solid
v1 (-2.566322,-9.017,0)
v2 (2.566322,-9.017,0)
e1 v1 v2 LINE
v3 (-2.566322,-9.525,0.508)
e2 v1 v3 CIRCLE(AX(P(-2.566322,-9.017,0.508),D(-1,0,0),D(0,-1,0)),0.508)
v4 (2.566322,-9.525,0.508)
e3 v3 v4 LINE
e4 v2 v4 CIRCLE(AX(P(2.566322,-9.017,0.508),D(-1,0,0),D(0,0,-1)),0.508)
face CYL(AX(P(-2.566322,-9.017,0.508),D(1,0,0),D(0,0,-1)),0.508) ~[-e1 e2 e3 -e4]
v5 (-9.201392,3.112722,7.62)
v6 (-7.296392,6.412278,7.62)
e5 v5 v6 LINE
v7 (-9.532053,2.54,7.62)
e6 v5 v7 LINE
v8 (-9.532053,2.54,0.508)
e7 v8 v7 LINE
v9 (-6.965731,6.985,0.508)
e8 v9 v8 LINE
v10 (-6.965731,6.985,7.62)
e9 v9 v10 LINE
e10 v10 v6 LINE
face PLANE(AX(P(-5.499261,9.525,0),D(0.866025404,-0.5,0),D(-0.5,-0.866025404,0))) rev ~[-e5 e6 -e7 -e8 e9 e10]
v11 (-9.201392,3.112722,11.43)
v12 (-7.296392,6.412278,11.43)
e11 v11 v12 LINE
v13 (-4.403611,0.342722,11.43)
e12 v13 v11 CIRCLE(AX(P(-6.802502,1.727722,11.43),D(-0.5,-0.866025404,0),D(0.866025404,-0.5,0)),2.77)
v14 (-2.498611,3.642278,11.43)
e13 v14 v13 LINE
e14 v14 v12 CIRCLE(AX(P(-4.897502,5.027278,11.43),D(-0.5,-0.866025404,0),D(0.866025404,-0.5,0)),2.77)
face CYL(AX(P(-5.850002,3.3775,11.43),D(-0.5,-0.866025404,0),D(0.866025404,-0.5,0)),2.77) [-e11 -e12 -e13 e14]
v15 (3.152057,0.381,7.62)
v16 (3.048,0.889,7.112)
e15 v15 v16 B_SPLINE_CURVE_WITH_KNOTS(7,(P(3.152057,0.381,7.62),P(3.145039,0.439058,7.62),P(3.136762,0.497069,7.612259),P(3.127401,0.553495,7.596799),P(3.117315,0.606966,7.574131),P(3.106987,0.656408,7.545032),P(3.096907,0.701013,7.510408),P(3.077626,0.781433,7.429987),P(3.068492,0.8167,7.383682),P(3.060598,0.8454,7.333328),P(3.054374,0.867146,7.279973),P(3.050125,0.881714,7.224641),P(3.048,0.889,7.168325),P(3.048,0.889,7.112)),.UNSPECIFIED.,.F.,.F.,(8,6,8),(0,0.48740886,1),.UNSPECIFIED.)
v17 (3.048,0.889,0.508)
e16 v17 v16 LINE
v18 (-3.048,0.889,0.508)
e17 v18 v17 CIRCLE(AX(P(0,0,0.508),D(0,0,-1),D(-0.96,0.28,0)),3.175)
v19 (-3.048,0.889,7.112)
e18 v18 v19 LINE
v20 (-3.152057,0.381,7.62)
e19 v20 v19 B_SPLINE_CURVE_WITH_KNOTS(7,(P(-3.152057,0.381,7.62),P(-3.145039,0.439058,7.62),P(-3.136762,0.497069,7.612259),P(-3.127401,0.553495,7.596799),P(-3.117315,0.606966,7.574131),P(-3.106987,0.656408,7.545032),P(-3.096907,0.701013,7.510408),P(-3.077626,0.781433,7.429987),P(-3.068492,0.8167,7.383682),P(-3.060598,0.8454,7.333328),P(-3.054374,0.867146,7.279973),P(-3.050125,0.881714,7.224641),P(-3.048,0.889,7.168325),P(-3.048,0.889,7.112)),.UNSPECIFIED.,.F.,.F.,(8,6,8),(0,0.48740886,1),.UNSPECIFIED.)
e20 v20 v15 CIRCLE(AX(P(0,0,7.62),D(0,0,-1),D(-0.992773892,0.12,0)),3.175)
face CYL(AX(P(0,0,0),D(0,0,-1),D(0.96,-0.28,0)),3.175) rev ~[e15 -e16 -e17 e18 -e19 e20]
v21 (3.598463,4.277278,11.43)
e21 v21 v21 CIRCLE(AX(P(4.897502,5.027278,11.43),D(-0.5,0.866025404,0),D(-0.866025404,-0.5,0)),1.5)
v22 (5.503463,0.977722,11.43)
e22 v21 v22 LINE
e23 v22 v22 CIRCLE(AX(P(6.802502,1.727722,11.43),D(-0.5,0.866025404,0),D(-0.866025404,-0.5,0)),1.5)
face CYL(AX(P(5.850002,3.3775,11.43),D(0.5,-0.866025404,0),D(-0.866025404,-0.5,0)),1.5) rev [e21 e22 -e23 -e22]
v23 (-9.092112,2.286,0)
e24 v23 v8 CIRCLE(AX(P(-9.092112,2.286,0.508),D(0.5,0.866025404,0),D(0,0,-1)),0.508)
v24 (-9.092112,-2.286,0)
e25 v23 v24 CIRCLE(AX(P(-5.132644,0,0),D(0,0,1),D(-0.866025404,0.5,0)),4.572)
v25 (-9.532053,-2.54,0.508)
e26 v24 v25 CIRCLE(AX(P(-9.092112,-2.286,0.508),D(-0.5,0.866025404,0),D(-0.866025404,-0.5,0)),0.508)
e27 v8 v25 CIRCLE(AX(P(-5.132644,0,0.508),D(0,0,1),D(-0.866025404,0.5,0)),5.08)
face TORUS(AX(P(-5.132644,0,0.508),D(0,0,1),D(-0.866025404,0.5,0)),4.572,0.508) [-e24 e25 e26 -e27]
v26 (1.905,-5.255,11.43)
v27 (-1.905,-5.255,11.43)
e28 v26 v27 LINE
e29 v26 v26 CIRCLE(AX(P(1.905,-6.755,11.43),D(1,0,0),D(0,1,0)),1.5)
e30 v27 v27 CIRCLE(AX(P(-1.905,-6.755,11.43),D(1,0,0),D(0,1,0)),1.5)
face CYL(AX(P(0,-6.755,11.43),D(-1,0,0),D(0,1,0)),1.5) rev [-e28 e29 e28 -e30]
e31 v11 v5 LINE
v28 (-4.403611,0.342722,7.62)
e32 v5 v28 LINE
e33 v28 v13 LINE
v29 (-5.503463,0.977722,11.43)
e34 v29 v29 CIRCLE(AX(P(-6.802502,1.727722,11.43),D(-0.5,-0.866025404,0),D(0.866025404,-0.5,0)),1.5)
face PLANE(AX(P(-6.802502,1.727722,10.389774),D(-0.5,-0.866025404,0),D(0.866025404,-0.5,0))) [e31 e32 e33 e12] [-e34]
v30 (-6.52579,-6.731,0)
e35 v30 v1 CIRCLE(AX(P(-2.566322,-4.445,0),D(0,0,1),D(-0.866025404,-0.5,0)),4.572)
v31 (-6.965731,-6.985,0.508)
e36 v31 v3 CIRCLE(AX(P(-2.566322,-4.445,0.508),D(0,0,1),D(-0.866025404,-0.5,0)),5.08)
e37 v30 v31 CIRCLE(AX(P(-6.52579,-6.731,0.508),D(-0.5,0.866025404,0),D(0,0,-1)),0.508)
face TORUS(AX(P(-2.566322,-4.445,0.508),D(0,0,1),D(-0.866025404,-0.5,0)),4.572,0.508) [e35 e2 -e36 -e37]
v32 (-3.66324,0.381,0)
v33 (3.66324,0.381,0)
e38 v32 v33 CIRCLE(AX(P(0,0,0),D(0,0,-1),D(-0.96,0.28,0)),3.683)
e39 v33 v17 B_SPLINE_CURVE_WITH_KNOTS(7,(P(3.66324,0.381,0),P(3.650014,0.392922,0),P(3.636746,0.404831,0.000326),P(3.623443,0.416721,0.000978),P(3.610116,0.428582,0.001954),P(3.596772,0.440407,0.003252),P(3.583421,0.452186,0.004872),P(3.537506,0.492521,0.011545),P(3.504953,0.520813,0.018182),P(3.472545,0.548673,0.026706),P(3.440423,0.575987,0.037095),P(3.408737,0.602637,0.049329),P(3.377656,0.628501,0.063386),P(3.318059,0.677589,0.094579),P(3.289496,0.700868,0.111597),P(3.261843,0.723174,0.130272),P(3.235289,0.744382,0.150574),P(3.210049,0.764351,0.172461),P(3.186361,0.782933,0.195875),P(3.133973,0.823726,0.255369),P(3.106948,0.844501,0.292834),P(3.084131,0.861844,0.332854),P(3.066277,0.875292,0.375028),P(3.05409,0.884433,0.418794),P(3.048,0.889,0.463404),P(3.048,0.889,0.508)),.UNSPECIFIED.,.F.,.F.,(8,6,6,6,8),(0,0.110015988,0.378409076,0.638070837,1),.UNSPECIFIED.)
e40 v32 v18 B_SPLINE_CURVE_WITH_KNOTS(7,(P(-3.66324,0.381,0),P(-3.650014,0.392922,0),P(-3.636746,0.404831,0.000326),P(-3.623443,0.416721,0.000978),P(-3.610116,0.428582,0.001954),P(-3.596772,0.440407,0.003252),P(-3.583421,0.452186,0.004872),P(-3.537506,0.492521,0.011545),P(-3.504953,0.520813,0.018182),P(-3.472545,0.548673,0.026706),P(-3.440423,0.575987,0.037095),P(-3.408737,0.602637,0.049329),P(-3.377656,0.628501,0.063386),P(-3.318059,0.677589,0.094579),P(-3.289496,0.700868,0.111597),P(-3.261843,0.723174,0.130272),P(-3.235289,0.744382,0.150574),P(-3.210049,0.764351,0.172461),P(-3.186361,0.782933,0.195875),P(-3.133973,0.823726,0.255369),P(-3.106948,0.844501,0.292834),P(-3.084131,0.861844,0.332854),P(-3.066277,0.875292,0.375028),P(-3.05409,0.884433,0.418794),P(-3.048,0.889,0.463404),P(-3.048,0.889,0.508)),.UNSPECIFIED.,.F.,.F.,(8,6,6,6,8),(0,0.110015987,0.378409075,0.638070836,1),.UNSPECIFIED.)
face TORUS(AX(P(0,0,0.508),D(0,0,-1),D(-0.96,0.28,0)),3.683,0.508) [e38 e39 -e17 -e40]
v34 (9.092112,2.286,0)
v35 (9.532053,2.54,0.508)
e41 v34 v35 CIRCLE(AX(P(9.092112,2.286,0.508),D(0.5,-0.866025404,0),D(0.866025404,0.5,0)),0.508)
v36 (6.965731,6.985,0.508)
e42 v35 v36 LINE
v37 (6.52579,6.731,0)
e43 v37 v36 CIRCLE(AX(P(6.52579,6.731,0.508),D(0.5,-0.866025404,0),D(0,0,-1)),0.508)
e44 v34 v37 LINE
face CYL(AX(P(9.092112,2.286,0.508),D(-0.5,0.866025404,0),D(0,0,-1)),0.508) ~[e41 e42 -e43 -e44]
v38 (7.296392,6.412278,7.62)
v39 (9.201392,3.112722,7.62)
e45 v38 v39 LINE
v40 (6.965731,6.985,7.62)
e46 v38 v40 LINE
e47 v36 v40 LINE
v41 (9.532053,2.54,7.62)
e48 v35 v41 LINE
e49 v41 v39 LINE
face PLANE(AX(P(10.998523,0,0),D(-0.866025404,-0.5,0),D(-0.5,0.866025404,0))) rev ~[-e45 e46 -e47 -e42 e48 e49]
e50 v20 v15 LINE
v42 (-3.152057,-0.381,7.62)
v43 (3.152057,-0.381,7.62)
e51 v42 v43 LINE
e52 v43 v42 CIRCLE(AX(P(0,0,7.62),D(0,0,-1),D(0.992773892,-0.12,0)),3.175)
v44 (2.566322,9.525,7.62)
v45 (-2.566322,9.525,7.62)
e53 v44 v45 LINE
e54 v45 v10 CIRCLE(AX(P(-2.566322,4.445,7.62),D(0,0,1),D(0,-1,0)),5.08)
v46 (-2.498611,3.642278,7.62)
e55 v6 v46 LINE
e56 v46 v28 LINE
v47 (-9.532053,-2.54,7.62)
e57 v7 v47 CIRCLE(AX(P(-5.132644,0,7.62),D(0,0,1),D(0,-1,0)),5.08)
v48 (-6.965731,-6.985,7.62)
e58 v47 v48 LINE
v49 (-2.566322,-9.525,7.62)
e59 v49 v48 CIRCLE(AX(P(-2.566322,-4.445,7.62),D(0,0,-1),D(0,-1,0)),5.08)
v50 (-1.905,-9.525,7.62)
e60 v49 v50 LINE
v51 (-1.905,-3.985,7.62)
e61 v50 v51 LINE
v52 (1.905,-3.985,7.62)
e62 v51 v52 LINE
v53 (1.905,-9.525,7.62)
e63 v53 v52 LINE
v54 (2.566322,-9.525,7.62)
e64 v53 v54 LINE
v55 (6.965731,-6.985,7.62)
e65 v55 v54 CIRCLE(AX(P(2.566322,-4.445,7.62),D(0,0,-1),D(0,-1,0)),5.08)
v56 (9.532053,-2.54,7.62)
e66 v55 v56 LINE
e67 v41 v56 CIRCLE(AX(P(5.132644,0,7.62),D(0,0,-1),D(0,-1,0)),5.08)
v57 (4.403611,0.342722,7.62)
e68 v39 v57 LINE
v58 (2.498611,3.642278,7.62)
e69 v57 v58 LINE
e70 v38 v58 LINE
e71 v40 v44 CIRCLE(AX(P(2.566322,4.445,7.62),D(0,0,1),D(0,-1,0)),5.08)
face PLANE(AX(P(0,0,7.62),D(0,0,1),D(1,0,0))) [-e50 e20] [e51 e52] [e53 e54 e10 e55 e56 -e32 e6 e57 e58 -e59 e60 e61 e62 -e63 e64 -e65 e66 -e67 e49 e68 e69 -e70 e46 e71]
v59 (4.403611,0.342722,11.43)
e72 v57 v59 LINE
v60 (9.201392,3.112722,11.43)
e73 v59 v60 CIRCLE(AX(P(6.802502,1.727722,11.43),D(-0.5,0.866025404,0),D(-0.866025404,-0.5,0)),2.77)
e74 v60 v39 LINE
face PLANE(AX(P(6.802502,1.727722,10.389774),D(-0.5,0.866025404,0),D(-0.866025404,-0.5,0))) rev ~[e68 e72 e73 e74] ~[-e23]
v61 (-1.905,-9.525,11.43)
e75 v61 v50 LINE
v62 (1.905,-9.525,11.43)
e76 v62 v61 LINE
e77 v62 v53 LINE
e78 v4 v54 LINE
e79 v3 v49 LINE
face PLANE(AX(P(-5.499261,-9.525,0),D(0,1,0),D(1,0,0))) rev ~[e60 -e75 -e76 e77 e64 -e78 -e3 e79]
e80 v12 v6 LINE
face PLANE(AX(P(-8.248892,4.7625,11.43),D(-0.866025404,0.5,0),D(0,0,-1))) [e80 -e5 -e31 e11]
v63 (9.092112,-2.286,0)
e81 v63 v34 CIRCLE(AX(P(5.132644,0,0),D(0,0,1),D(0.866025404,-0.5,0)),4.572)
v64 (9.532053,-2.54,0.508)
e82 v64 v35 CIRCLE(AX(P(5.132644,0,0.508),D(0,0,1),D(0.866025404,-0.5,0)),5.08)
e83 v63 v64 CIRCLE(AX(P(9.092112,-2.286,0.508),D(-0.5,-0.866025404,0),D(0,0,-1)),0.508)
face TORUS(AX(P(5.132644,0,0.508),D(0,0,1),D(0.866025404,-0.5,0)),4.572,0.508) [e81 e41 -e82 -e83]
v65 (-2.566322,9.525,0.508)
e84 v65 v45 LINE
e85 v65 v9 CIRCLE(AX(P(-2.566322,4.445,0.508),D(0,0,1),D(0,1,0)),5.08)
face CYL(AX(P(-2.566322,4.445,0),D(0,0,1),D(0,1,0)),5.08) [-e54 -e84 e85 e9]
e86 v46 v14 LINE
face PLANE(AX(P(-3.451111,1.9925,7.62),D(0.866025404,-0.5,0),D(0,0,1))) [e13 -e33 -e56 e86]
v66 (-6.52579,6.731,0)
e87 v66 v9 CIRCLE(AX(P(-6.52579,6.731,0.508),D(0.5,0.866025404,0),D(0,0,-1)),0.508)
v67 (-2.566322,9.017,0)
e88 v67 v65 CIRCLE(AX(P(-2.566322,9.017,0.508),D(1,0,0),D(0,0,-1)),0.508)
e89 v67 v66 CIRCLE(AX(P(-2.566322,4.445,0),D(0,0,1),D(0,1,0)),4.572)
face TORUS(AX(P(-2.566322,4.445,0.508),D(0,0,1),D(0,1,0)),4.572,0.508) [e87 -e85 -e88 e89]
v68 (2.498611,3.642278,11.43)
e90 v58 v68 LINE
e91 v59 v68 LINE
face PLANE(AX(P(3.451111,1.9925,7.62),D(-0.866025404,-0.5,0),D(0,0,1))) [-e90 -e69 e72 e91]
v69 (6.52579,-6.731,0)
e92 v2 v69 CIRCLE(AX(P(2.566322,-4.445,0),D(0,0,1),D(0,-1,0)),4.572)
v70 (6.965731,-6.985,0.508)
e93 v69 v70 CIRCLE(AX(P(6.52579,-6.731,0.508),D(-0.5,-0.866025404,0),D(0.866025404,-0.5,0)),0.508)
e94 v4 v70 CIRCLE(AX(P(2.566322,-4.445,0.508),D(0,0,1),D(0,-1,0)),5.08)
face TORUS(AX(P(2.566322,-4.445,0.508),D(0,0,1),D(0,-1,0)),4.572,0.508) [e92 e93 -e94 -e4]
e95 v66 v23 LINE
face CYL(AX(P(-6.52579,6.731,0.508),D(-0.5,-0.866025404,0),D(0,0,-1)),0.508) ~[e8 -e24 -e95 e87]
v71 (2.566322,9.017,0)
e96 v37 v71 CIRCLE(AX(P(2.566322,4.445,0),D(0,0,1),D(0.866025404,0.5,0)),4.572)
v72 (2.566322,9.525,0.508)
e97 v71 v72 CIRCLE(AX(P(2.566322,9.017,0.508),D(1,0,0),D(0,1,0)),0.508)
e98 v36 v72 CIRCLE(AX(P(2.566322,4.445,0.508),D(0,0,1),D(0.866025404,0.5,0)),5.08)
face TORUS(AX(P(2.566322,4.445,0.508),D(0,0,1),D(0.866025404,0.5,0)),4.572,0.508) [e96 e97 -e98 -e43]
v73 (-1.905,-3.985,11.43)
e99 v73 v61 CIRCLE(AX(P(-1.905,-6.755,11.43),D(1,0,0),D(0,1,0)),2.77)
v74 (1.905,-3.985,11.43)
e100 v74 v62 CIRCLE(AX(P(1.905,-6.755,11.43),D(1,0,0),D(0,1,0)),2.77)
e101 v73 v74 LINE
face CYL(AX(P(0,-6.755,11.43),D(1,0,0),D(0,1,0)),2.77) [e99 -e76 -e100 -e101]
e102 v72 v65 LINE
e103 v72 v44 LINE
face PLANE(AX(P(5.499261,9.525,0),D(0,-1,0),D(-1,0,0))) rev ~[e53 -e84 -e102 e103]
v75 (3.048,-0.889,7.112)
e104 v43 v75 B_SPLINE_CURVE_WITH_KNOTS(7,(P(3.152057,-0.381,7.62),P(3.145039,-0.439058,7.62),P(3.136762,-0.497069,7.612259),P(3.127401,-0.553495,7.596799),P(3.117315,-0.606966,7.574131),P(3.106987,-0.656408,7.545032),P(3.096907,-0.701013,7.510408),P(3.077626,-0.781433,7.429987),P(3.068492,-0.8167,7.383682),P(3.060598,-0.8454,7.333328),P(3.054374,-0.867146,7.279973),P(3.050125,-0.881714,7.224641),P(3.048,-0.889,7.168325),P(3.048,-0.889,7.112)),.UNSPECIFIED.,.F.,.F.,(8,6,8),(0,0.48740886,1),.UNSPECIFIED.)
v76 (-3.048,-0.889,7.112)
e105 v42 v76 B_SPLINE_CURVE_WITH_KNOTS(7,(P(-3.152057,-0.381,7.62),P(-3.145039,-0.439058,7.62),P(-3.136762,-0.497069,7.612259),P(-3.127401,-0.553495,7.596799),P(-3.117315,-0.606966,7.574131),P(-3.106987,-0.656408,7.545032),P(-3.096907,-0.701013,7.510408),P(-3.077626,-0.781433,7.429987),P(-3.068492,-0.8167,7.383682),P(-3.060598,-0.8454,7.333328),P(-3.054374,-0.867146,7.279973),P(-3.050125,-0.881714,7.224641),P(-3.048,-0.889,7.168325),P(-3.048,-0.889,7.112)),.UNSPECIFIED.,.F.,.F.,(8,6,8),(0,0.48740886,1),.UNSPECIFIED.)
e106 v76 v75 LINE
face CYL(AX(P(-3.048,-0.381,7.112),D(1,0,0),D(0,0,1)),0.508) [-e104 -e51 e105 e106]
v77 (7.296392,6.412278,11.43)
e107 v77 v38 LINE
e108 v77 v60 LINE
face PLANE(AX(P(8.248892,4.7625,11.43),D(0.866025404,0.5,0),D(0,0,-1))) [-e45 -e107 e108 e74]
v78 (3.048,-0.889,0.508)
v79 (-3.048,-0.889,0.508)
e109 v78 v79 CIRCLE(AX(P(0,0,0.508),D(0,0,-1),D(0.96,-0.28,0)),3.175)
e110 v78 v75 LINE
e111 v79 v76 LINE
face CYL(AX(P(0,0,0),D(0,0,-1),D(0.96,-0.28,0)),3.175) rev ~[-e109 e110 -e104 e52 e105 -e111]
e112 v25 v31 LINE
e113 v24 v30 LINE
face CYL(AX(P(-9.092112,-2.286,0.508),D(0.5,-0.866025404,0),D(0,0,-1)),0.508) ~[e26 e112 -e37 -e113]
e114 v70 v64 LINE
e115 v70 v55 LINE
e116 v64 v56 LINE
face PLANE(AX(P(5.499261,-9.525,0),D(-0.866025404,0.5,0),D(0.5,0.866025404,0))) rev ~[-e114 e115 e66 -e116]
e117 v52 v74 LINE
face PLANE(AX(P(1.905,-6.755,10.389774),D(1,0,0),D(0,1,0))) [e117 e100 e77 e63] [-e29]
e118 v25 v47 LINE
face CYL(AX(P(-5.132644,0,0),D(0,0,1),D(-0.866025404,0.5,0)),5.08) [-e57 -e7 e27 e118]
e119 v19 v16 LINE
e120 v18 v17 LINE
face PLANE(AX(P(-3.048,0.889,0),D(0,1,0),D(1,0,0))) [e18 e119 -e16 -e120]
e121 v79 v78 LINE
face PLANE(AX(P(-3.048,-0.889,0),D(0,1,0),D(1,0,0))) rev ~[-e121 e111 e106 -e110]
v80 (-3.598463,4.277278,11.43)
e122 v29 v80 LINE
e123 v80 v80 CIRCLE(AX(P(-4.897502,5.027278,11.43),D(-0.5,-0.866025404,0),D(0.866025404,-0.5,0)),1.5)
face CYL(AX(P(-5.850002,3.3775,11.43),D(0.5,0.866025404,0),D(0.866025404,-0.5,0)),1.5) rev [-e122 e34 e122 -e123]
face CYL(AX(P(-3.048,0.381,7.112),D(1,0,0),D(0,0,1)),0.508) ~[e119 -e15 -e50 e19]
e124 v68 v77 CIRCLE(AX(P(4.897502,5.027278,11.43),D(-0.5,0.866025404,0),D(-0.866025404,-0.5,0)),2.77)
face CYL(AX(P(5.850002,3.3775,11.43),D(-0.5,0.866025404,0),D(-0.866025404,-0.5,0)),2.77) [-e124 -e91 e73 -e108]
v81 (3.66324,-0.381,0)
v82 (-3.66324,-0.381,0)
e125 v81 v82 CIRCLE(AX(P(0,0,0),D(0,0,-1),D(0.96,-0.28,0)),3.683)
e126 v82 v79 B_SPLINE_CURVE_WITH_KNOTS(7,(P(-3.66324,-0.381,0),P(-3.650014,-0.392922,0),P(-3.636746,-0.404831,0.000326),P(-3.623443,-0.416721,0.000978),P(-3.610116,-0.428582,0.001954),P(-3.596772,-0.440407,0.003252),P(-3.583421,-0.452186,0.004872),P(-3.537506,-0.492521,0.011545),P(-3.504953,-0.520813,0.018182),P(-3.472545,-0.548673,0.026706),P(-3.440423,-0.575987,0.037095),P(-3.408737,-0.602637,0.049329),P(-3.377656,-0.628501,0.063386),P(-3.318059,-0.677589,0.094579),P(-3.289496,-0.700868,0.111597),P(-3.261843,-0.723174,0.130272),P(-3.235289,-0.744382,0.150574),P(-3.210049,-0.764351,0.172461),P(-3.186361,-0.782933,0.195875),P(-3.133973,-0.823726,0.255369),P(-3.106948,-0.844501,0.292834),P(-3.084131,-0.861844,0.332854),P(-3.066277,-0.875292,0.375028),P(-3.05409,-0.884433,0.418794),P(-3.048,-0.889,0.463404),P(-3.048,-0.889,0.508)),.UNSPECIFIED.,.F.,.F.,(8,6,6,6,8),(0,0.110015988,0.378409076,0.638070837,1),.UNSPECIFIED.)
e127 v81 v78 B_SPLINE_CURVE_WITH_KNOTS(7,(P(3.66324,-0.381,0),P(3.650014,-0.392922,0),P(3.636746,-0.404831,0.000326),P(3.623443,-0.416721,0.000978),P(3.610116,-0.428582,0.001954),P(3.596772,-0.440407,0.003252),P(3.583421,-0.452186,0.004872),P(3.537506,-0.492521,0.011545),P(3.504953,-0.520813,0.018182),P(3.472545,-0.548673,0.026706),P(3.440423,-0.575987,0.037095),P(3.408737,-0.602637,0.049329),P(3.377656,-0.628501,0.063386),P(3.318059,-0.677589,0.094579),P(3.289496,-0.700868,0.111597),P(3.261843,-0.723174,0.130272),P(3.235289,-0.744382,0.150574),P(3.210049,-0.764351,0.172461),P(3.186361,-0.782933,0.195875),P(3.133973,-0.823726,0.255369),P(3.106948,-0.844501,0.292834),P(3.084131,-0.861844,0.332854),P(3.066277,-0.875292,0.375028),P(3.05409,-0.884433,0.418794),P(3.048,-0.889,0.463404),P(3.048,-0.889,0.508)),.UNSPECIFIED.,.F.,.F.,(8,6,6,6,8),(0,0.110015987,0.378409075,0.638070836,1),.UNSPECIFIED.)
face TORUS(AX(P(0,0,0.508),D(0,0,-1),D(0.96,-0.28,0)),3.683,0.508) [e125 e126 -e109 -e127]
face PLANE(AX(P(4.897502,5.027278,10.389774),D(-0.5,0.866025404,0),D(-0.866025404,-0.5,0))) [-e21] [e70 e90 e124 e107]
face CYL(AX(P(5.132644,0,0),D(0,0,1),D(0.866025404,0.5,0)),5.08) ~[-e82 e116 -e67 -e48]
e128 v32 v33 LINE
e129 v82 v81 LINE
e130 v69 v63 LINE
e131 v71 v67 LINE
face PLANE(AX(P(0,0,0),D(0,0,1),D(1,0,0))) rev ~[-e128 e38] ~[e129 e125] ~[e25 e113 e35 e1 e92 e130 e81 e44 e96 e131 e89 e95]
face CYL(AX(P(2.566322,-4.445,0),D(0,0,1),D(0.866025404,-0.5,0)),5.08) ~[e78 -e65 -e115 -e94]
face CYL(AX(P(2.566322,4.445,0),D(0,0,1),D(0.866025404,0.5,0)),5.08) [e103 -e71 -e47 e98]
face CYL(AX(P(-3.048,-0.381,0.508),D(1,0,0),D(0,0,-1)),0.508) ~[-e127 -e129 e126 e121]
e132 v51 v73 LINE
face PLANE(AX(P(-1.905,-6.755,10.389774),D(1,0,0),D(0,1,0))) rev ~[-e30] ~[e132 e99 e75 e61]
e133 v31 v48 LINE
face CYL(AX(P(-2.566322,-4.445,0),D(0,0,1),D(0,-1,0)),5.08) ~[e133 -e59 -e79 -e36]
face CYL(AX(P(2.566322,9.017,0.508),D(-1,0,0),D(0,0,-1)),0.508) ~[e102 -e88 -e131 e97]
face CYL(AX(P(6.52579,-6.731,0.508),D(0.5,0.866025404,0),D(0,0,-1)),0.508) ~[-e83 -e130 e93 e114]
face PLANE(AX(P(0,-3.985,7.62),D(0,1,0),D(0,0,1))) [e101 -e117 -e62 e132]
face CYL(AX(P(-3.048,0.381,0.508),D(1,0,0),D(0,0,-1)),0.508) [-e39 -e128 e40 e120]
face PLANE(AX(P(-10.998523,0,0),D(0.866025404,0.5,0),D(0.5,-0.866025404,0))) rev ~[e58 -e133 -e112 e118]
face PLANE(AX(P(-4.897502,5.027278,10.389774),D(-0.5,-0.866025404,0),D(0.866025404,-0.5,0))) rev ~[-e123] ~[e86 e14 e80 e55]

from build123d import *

# Parameters (mm, degrees)
F0_W            = 6.096
F0_H            = 1.778
F1_DEPTH        = 7.62
F2_R            = 1.5
F3_DEPTH        = 1.905
F3_COPIES_COUNT = 3
F4_R            = 5.08
F5_R            = 0.508


# Not quite as in the source:
# - a pattern or mirror of a feature is missing from the dataset's text; its kind, count and spacing are read off the source's solid


with BuildPart() as f1:
    # F0 (on Top) → F1 (new body)
    with BuildSketch(Plane.XY):
        Polygon((10.9985226281, 0), (5.499261314, 9.525), (-5.499261314, 9.525), (-10.9985226281, 0), (-5.499261314, -9.525), (5.499261314, -9.525), align=None)
        with BuildLine():
            ThreePointArc((3.048, 0.889), (3.1430896424, 0.4490128061), (3.175, 0))
            ThreePointArc((3.175, 0), (3.1430896424, -0.4490128061), (3.048, -0.889))
            ThreePointArc((3.048, -0.889), (0, -3.175), (-3.048, -0.889))
            ThreePointArc((-3.048, -0.889), (-3.175, 0), (-3.048, 0.889))
            ThreePointArc((-3.048, 0.889), (0, 3.175), (3.048, 0.889))
        make_face(mode=Mode.SUBTRACT)
        Rectangle(F0_W, F0_H)
        with BuildLine():
            Line((-3.048, -0.889), (-3.048, 0.889))
            ThreePointArc((-3.048, 0.889), (-3.175, 0), (-3.048, -0.889))
        make_face()
        with BuildLine():
            ThreePointArc((3.048, -0.889), (3.1430896424, -0.4490128061), (3.175, 0))
            ThreePointArc((3.175, 0), (3.1430896424, 0.4490128061), (3.048, 0.889))
            Line((3.048, 0.889), (3.048, -0.889))
        make_face()
    extrude(amount=F1_DEPTH)

    # F2 (on Right) → F3 (join, symmetric)
    with BuildSketch(Plane.YZ):
        with BuildLine():
            Line((-9.525, 7.62), (-3.985, 7.62))
            Line((-3.985, 7.62), (-3.985, 11.43))
            ThreePointArc((-3.985, 11.43), (-6.755, 14.2), (-9.525, 11.43))
            Line((-9.525, 11.43), (-9.525, 7.62))
        make_face()
        with Locations((-6.755, 11.43)):
            Circle(F2_R, mode=Mode.SUBTRACT)
    f3 = extrude(amount=F3_DEPTH, both=True)

    # F3_copies: F3 ×3 about axis
    f3_copies_axis = Axis((0, 0, 0), (0, 0, 1))
    for i in range(1, F3_COPIES_COUNT):
        add(f3.rotate(f3_copies_axis, i * 360 / F3_COPIES_COUNT))

    # F4
    f4_edges = [f1.edges().sort_by_distance(p)[0] for p in [
        (-5.499261, -9.525, 3.81),
        (-10.998523, 0, 3.81),
        (-5.499261, 9.525, 3.81),
        (5.499261, 9.525, 3.81),
        (10.998523, 0, 3.81),
        (5.499261, -9.525, 3.81),
    ]]
    fillet(f4_edges, radius=F4_R)

    # F5
    f5_edges = [f1.edges().sort_by_distance(p)[0] for p in [
        (0, -0.889, 7.62),
        (0, 0.889, 7.62),
        (0, -0.889, 0),
        (0, 0.889, 0),
        (0, 3.175, 0),
        (-8.248892, 4.7625, 0),
        (8.248892, 4.7625, 0),
        (10.212644, 0, 0),
        (5.106322, 8.844409, 0),
        (8.248892, -4.7625, 0),
        (0, 9.525, 0),
        (5.106322, -8.844409, 0),
        (-5.106322, 8.844409, 0),
        (0, -9.525, 0),
        (-5.106322, -8.844409, 0),
        (-10.212644, 0, 0),
        (-8.248892, -4.7625, 0),
        (0, -3.175, 0),
    ]]
    fillet(f5_edges, radius=F5_R)


solid = f1.part
